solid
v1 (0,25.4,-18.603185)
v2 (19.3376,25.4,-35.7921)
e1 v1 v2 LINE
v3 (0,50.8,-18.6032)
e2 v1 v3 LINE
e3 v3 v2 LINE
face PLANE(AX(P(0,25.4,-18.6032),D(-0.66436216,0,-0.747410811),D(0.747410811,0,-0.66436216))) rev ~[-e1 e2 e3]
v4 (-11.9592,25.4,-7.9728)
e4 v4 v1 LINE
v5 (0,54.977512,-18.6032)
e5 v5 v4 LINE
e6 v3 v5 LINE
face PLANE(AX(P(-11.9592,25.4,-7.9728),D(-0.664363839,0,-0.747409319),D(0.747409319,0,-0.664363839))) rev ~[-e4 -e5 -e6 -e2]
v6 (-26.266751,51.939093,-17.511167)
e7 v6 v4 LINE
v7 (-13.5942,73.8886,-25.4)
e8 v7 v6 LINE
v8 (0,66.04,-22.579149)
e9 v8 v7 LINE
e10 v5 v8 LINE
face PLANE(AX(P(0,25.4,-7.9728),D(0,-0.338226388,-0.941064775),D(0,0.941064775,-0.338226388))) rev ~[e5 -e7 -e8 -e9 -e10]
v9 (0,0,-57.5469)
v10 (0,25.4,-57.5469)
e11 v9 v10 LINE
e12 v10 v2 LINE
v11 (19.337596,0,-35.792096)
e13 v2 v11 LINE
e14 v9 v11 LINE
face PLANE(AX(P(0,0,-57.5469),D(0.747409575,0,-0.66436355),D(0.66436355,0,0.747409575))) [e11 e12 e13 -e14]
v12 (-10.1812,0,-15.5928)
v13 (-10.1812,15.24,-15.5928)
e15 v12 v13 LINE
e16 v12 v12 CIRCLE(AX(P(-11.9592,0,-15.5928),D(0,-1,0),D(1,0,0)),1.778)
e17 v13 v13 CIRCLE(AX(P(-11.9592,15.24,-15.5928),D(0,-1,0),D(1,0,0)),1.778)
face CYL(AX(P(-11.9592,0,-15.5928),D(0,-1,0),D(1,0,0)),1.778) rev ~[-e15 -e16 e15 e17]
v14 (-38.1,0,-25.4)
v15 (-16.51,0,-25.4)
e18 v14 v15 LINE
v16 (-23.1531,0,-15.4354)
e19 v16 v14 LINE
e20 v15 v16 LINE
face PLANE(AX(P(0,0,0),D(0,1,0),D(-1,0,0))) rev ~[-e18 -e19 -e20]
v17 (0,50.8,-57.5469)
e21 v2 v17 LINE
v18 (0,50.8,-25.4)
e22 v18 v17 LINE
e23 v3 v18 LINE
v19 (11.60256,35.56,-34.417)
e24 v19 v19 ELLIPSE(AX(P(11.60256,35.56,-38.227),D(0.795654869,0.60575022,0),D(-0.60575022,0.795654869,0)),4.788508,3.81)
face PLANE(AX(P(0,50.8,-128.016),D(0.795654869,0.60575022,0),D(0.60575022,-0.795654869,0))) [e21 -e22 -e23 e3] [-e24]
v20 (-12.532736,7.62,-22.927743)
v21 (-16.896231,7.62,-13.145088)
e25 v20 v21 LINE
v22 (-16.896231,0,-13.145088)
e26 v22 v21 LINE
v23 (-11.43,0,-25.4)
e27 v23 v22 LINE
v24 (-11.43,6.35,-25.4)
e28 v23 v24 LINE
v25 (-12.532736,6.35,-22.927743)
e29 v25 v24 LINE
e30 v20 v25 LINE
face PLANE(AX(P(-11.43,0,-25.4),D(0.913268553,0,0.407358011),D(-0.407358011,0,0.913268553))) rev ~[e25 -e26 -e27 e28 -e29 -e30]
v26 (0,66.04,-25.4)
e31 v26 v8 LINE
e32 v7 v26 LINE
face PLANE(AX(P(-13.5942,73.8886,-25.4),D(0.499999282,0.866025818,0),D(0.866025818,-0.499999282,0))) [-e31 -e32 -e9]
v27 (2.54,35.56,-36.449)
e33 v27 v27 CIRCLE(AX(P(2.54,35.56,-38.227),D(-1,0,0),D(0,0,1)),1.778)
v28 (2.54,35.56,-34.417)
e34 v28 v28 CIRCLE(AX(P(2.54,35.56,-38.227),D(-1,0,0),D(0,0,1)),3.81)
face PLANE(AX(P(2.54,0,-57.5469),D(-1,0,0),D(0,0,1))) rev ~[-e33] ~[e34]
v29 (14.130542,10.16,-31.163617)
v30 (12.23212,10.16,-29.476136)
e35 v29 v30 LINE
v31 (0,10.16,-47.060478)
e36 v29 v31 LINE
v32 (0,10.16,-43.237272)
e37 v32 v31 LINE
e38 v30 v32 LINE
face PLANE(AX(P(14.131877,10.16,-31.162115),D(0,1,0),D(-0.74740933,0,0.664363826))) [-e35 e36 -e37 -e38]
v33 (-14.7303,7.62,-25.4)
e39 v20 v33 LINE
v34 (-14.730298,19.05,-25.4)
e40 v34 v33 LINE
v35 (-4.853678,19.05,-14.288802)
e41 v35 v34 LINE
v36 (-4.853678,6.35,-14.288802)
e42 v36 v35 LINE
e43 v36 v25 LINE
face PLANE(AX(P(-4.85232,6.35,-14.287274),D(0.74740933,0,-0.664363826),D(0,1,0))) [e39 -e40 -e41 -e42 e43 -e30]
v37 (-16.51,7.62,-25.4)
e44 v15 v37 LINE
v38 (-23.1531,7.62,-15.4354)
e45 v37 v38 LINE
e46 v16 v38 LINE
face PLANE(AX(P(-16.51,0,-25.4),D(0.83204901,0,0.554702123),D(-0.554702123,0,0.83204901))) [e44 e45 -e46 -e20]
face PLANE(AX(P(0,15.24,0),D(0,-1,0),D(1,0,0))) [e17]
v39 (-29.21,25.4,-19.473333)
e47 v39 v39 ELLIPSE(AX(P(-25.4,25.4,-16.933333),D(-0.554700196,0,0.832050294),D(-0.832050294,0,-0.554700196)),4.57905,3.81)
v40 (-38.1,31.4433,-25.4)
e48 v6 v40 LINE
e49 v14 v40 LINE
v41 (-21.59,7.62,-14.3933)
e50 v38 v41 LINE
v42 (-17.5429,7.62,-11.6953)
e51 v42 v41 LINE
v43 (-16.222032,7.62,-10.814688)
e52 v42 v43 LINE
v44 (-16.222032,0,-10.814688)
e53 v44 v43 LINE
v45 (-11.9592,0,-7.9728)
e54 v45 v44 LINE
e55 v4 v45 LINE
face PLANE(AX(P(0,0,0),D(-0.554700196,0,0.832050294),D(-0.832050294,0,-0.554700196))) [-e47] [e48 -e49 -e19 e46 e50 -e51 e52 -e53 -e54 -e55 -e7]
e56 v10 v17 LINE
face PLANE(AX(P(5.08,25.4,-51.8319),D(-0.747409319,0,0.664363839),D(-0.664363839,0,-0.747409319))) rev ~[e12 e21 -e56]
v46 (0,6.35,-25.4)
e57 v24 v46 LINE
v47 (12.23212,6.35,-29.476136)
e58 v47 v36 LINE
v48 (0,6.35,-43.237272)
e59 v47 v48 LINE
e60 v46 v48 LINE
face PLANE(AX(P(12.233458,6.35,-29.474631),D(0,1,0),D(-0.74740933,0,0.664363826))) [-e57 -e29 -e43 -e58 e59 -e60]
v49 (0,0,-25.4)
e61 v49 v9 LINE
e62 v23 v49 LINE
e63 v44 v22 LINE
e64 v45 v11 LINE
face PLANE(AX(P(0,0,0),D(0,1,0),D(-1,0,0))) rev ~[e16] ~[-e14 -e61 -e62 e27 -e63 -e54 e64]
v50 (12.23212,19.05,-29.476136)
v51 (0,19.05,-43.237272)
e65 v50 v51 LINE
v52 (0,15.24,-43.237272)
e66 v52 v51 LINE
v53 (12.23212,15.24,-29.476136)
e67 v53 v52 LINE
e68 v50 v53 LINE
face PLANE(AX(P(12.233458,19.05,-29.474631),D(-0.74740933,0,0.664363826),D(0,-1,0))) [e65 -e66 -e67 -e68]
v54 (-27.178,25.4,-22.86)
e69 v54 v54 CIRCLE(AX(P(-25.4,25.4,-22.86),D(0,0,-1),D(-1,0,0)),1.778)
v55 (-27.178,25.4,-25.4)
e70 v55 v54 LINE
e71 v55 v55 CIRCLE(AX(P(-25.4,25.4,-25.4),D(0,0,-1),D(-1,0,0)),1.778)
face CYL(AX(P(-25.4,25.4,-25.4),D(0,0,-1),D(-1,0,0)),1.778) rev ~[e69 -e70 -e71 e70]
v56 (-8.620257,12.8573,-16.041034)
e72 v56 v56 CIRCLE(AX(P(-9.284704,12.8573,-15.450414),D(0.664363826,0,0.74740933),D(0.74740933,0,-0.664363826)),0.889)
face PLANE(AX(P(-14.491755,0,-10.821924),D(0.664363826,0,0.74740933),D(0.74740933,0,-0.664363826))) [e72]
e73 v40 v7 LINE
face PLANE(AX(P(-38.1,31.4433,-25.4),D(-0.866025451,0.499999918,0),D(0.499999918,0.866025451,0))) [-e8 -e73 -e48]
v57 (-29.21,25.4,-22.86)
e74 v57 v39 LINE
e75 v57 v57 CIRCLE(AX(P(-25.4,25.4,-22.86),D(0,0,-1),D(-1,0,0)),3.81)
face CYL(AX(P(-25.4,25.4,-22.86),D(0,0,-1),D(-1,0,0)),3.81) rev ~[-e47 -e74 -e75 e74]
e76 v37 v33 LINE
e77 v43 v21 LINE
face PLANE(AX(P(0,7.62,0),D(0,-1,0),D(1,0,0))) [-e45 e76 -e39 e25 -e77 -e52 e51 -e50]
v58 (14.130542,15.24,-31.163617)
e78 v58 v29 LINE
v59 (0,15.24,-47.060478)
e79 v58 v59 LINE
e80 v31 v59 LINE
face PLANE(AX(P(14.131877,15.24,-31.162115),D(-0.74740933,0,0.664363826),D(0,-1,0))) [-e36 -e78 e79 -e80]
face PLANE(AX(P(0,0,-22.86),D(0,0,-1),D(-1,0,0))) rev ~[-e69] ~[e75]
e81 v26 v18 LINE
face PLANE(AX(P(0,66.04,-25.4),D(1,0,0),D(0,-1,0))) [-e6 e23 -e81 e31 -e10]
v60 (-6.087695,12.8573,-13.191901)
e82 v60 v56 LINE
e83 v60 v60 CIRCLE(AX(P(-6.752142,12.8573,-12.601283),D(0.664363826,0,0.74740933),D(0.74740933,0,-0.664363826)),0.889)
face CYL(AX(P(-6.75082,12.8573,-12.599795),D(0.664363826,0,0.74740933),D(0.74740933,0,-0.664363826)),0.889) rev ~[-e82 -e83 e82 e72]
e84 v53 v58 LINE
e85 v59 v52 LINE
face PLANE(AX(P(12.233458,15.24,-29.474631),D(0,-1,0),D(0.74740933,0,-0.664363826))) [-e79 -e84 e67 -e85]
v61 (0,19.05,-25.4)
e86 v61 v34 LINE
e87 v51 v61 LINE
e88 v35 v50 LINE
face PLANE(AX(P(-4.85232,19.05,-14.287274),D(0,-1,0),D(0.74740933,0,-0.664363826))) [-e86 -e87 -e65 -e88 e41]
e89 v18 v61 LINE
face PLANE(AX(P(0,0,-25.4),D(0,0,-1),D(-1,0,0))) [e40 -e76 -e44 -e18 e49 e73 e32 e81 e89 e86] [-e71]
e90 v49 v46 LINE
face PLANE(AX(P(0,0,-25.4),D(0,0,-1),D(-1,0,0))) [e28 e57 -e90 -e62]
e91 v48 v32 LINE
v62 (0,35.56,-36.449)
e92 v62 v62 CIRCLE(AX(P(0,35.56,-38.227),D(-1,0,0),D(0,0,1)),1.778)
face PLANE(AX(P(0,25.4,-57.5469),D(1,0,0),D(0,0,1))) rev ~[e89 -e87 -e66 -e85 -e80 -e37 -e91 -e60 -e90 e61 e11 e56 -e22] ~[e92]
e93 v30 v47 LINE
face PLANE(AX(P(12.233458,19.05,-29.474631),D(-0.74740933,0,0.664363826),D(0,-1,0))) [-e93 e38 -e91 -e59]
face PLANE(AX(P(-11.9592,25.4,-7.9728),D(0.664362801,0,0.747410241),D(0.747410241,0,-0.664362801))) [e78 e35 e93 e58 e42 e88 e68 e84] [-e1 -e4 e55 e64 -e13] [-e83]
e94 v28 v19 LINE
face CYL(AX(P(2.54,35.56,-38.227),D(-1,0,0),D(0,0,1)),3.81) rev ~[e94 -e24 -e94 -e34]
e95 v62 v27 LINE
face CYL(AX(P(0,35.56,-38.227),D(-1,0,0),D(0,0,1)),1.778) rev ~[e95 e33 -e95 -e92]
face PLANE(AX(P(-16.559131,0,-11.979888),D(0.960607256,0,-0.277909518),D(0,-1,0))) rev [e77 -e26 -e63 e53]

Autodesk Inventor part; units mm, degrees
ref_plane "YZ Plane" through (0, 0, 0) normal (1, 0, 0) x (0, 1, 0)
ref_plane "XZ Plane" through (0, 0, 0) normal (0, 1, 0) x (-1, 0, 0)
ref_plane "XY Plane" through (0, 0, 0) normal (0, 0, 1) x (1, 0, 0)
sketch "Sketch1" plane through (0, 0, 0) normal (0, 1, 0) x (-1, 0, 0)
  line L0 (0, 0) -> (38.1, -25.4)
  line L1 (38.1, -25.4) -> (0, -25.4)
  line L2 (0, -25.4) -> (0, -57.5469)
  line L3 (0, -57.5469) -> (-28.575, -25.4)
  line L4 (-28.575, -25.4) -> (0, 0)
  dimension "d0" = 38.1
  dimension "d2" = 25.4
  dimension "d3" = 28.575
extrude "Extrusion1" add sketch "Sketch1" along normal blind 25.4
sketch "Sketch2" plane through (0, 25.4, 0) normal (0, 1, 0) x (1, 0, 0)
  line L0 (-38.1, 25.4) -> (0, 0) projected
  line L1 (-11.9592, 7.9728) -> (19.3376, 35.7921)
  line L2 (0, 0) -> (28.575, 25.4) projected
  line L3 (28.575, 25.4) -> (0, 57.5469) projected
  point P0 (0, 25.4)
  dimension "d6" = 5.08
extrude "Extrusion2" cut sketch "Sketch2" against normal blind 49.2125
sketch "Sketch3" plane through (19.3376, 0, -35.7921) normal (0.6643638, 0, 0.7474093) x (0.7474093, 0, -0.6643638)
  line L0 (-32.3668, 19.05) -> (-9.5068, 19.05)
  line L1 (-9.5068, 19.05) -> (-9.5068, 6.35)
  line L2 (-9.5068, 6.35) -> (-32.3668, 6.35)
  line L3 (-32.3668, 6.35) -> (-32.3668, 19.05)
  line L4 (0, 25.4) -> (0, 0) projected
  line L5 (-41.8736, 25.4) -> (0, 25.4) projected
  point P0 (-38.2321, 0)
  point P1 (-9.5068, 12.7)
  point P2 (0, 12.7)
  point P3 (-20.9368, 19.05)
  point P4 (-20.9368, 25.4)
  dimension "d9" = 12.7
  dimension "d10" = 22.86
extrude "Extrusion3" cut sketch "Sketch3" against normal blind 82.55
sketch "Sketch4" plane through (19.3376, 0, -35.7921) normal (0.6643638, 0, 0.7474093) x (0.7474093, 0, -0.6643638)
  point P0 (-38.2321, 0)
sketch "Sketch5" plane through (19.3376, 0, -35.7921) normal (0.6643638, 0, 0.7474093) x (0.7474093, 0, -0.6643638)
  line L0 (-9.5068, 6.35) -> (-9.5068, 19.05) projected
  line L1 (-9.5068, 15.24) -> (-6.9668, 15.24)
  line L2 (-6.9668, 15.24) -> (-6.9668, 10.16)
  line L3 (-6.9668, 10.16) -> (-9.5068, 10.16)
  line L4 (-9.5068, 10.16) -> (-9.5068, 15.24)
  point P0 (-38.2321, 0)
  point P1 (-6.9668, 12.7)
  point P2 (-9.5068, 12.7)
  dimension "d13" = 2.54
  dimension "d14" = 5.08
extrude "Extrusion4" cut sketch "Sketch5" against normal blind 36.5125
sketch "Sketch7" plane through (0, 0, -25.4) normal (0, 0, -1) x (-1, 0, 0)
  line L0 (0, 25.4) -> (38.1, 25.4) projected
  line L1 (38.1, 0) -> (38.1, 31.4433) projected
  line L2 (38.1, 31.4433) -> (13.5942, 73.8886) projected
  line L3 (0, 66.04) -> (0, 19.05) projected
  line L4 (13.5942, 73.8886) -> (0, 66.04) projected
  point P0 (0, 0)
extrude "Extrusion6" add sketch "Sketch7" against normal blind 20.6375
sketch "Sketch8" plane through (-38.1, 25.4, -4.7625) normal (0, -1, 0) x (1, 0, 0)
  line L0 (0, -20.6375) -> (26.1408, -3.2103) projected
  line L1 (26.1408, -3.2103) -> (38.1, -13.8407) projected
  line L2 (38.1, -13.8407) -> (38.1, 0) projected
  line L3 (0, 0) -> (38.1, 0) projected
  line L4 (0, -20.6375) -> (0, 0) projected
  point P0 (38.1, 4.7625)
extrude "Extrusion7" cut sketch "Sketch8" against normal blind 74.6125
sketch "Sketch9" plane through (0, 25.4, -25.4) normal (1, 0, 0) x (0, 0, -1)
  line L0 (0, 0) -> (-6.7968, 0) projected
  line L1 (-17.4272, -25.4) -> (-17.4272, 47.5446) projected
  line L2 (0, 0) -> (-17.4272, 0)
  line L3 (-17.4272, 0) -> (0, 48.4886)
  line L4 (0, 48.4886) -> (-17.4272, 48.4886)
  line L5 (-17.4272, 48.4886) -> (-17.4272, 0)
  point P0 (-25.4, -25.4)
extrude "Extrusion8" cut sketch "Sketch9" against normal blind 92.075
sketch "Sketch10" plane through (0, 25.4, 0) normal (0, 1, 0) x (1, 0, 0)
  line L0 (0, 25.4) -> (0, 18.6032) projected
  line L1 (0, 18.6032) -> (19.3376, 35.7921) projected
  line L2 (19.3376, 35.7921) -> (0, 57.5469) projected
  line L3 (0, 57.5469) -> (0, 25.4) projected
  line L4 (5.08, 51.054) -> (5.08, 24.93) projected
  line L5 (5.08, 24.93) -> (5.08, 23.1187) projected
  line L6 (5.08, 52.3795) -> (5.08, 51.054) projected
  point P0 (0, 0)
extrude "Extrusion9" add sketch "Sketch10" along normal blind 25.4
ref_plane "Work Plane1" through (0, -6.35, -128.016) normal (0, 0, -1) x (0, 1, 0)
sketch "Sketch11" plane through (0, -6.35, -128.016) normal (0, 0, -1) x (0, 1, 0)
  line L0 (57.15, 19.3376) -> (57.15, 0) projected
  line L1 (57.15, 0) -> (31.75, 19.3376)
  line L2 (57.15, 19.3376) -> (6.35, 19.3376) projected
  line L3 (31.75, 19.3376) -> (57.15, 19.3376)
  line L4 (57.15, 19.3376) -> (57.15, 0)
  point P0 (6.35, 0)
  dimension "d27" = 25.4
extrude "Extrusion10" cut sketch "Sketch11" against normal blind 209.55
sketch "Sketch12" plane through (0, 0, -57.5469) normal (-1, 0, 0) x (0, 0, 1)
  circle A0 centre (19.3199, 35.56) radius 1.778
  line L0 (6.4929, 66.04) -> (6.4929, 0) projected
  line L1 (0, 50.8) -> (32.1469, 50.8) projected
  point P0 (57.5469, 0)
  dimension "d30" = 3.556
  dimension "d31" = 12.827
  dimension "d32" = 15.24
extrude "Extrusion11" cut sketch "Sketch12" against normal blind 209.55
ref_plane "Work Plane2" through (2.54, 0, -57.5469) normal (-1, 0, 0) x (0, 0, 1)
sketch "Sketch13" plane through (2.54, 0, -57.5469) normal (-1, 0, 0) x (0, 0, 1)
  circle A0 centre (19.3199, 35.56) radius 1.778 projected
  circle A1 centre (19.3199, 35.56) radius 3.81
  point P0 (57.5469, 0)
  dimension "d36" = 7.62
extrude "Extrusion12" cut sketch "Sketch13" against normal blind 209.55 contours A0 | A1
sketch "Sketch14" plane through (0, 0, -25.4) normal (0, 0, -1) x (-1, 0, 0)
  circle A0 centre (25.4, 25.4) radius 1.778
  line L0 (38.1, 0) -> (38.1, 31.4433) projected
  line L1 (0, 0) -> (38.1, 0) projected
  dimension "d39" = 3.556
  dimension "d40" = 12.7
  dimension "d41" = 25.4
extrude "Extrusion13" cut sketch "Sketch14" against normal blind 115.8875
ref_plane "Work Plane3" through (0, 0, -22.86) normal (0, 0, -1) x (-1, 0, 0)
sketch "Sketch15" plane through (0, 0, -22.86) normal (0, 0, -1) x (-1, 0, 0)
  circle A0 centre (25.4, 25.4) radius 1.778 projected
  circle A1 centre (25.4, 25.4) radius 3.81
  point P0 (0, 0)
  dimension "d45" = 7.62
extrude "Extrusion14" cut sketch "Sketch15" against normal blind 115.8875
sketch "Sketch16" plane through (0, 0, 0) normal (0, -1, 0) x (1, 0, 0)
  circle A0 centre (-11.9592, -15.5928) radius 1.778 projected
  point P0 (0, 0)
extrude "Extrusion15" cut sketch "Sketch16" against normal blind 15.24
sketch "Sketch17" plane through (-11.9592, 0, -7.9728) normal (0.6643638, 0, 0.7474093) x (0.7474093, 0, -0.6643638)
  circle A0 centre (6.9668, 12.8573) radius 0.889
  circle A1 centre (34.9068, 12.8573) radius 0.889
  line L0 (32.3668, 6.35) -> (9.5068, 6.35) projected
  point P0 (3.6416, 0)
  point P1 (20.9368, 6.35)
  dimension "d50" = 27.94
  dimension "d51" = 1.778
  dimension "d52" = 1.778
  dimension "d53" = 13.97
extrude "Extrusion16" cut sketch "Sketch17" against normal blind 3.81 contours A0
sketch "Sketch19" plane through (0, 0, 0) normal (0, -1, 0) x (1, 0, 0)
  line L0 (-16.51, -25.4) -> (-14.7303, -25.4) projected
  line L1 (-16.51, -25.4) -> (-23.1531, -15.4354)
  line L2 (-29.21, -19.4733) -> (-21.59, -14.3933) projected
  line L3 (-11.43, -25.4) -> (-17.5429, -11.6953)
  line L4 (-11.9592, -7.9728) -> (-26.2667, -17.5112) projected
  line L5 (0, -25.4) -> (-38.1, -25.4) projected
  point P0 (0, 0)
extrude "Extrusion18" cut sketch "Sketch19" against normal blind 7.62
chamfer "Chamfer1" distance 1.5875 angle 45 1 edges at (-17.5429, 3.81, -11.6953)
equation "\"d53\" = 0.5 * d50"
properties part number "Thumb Base2"
